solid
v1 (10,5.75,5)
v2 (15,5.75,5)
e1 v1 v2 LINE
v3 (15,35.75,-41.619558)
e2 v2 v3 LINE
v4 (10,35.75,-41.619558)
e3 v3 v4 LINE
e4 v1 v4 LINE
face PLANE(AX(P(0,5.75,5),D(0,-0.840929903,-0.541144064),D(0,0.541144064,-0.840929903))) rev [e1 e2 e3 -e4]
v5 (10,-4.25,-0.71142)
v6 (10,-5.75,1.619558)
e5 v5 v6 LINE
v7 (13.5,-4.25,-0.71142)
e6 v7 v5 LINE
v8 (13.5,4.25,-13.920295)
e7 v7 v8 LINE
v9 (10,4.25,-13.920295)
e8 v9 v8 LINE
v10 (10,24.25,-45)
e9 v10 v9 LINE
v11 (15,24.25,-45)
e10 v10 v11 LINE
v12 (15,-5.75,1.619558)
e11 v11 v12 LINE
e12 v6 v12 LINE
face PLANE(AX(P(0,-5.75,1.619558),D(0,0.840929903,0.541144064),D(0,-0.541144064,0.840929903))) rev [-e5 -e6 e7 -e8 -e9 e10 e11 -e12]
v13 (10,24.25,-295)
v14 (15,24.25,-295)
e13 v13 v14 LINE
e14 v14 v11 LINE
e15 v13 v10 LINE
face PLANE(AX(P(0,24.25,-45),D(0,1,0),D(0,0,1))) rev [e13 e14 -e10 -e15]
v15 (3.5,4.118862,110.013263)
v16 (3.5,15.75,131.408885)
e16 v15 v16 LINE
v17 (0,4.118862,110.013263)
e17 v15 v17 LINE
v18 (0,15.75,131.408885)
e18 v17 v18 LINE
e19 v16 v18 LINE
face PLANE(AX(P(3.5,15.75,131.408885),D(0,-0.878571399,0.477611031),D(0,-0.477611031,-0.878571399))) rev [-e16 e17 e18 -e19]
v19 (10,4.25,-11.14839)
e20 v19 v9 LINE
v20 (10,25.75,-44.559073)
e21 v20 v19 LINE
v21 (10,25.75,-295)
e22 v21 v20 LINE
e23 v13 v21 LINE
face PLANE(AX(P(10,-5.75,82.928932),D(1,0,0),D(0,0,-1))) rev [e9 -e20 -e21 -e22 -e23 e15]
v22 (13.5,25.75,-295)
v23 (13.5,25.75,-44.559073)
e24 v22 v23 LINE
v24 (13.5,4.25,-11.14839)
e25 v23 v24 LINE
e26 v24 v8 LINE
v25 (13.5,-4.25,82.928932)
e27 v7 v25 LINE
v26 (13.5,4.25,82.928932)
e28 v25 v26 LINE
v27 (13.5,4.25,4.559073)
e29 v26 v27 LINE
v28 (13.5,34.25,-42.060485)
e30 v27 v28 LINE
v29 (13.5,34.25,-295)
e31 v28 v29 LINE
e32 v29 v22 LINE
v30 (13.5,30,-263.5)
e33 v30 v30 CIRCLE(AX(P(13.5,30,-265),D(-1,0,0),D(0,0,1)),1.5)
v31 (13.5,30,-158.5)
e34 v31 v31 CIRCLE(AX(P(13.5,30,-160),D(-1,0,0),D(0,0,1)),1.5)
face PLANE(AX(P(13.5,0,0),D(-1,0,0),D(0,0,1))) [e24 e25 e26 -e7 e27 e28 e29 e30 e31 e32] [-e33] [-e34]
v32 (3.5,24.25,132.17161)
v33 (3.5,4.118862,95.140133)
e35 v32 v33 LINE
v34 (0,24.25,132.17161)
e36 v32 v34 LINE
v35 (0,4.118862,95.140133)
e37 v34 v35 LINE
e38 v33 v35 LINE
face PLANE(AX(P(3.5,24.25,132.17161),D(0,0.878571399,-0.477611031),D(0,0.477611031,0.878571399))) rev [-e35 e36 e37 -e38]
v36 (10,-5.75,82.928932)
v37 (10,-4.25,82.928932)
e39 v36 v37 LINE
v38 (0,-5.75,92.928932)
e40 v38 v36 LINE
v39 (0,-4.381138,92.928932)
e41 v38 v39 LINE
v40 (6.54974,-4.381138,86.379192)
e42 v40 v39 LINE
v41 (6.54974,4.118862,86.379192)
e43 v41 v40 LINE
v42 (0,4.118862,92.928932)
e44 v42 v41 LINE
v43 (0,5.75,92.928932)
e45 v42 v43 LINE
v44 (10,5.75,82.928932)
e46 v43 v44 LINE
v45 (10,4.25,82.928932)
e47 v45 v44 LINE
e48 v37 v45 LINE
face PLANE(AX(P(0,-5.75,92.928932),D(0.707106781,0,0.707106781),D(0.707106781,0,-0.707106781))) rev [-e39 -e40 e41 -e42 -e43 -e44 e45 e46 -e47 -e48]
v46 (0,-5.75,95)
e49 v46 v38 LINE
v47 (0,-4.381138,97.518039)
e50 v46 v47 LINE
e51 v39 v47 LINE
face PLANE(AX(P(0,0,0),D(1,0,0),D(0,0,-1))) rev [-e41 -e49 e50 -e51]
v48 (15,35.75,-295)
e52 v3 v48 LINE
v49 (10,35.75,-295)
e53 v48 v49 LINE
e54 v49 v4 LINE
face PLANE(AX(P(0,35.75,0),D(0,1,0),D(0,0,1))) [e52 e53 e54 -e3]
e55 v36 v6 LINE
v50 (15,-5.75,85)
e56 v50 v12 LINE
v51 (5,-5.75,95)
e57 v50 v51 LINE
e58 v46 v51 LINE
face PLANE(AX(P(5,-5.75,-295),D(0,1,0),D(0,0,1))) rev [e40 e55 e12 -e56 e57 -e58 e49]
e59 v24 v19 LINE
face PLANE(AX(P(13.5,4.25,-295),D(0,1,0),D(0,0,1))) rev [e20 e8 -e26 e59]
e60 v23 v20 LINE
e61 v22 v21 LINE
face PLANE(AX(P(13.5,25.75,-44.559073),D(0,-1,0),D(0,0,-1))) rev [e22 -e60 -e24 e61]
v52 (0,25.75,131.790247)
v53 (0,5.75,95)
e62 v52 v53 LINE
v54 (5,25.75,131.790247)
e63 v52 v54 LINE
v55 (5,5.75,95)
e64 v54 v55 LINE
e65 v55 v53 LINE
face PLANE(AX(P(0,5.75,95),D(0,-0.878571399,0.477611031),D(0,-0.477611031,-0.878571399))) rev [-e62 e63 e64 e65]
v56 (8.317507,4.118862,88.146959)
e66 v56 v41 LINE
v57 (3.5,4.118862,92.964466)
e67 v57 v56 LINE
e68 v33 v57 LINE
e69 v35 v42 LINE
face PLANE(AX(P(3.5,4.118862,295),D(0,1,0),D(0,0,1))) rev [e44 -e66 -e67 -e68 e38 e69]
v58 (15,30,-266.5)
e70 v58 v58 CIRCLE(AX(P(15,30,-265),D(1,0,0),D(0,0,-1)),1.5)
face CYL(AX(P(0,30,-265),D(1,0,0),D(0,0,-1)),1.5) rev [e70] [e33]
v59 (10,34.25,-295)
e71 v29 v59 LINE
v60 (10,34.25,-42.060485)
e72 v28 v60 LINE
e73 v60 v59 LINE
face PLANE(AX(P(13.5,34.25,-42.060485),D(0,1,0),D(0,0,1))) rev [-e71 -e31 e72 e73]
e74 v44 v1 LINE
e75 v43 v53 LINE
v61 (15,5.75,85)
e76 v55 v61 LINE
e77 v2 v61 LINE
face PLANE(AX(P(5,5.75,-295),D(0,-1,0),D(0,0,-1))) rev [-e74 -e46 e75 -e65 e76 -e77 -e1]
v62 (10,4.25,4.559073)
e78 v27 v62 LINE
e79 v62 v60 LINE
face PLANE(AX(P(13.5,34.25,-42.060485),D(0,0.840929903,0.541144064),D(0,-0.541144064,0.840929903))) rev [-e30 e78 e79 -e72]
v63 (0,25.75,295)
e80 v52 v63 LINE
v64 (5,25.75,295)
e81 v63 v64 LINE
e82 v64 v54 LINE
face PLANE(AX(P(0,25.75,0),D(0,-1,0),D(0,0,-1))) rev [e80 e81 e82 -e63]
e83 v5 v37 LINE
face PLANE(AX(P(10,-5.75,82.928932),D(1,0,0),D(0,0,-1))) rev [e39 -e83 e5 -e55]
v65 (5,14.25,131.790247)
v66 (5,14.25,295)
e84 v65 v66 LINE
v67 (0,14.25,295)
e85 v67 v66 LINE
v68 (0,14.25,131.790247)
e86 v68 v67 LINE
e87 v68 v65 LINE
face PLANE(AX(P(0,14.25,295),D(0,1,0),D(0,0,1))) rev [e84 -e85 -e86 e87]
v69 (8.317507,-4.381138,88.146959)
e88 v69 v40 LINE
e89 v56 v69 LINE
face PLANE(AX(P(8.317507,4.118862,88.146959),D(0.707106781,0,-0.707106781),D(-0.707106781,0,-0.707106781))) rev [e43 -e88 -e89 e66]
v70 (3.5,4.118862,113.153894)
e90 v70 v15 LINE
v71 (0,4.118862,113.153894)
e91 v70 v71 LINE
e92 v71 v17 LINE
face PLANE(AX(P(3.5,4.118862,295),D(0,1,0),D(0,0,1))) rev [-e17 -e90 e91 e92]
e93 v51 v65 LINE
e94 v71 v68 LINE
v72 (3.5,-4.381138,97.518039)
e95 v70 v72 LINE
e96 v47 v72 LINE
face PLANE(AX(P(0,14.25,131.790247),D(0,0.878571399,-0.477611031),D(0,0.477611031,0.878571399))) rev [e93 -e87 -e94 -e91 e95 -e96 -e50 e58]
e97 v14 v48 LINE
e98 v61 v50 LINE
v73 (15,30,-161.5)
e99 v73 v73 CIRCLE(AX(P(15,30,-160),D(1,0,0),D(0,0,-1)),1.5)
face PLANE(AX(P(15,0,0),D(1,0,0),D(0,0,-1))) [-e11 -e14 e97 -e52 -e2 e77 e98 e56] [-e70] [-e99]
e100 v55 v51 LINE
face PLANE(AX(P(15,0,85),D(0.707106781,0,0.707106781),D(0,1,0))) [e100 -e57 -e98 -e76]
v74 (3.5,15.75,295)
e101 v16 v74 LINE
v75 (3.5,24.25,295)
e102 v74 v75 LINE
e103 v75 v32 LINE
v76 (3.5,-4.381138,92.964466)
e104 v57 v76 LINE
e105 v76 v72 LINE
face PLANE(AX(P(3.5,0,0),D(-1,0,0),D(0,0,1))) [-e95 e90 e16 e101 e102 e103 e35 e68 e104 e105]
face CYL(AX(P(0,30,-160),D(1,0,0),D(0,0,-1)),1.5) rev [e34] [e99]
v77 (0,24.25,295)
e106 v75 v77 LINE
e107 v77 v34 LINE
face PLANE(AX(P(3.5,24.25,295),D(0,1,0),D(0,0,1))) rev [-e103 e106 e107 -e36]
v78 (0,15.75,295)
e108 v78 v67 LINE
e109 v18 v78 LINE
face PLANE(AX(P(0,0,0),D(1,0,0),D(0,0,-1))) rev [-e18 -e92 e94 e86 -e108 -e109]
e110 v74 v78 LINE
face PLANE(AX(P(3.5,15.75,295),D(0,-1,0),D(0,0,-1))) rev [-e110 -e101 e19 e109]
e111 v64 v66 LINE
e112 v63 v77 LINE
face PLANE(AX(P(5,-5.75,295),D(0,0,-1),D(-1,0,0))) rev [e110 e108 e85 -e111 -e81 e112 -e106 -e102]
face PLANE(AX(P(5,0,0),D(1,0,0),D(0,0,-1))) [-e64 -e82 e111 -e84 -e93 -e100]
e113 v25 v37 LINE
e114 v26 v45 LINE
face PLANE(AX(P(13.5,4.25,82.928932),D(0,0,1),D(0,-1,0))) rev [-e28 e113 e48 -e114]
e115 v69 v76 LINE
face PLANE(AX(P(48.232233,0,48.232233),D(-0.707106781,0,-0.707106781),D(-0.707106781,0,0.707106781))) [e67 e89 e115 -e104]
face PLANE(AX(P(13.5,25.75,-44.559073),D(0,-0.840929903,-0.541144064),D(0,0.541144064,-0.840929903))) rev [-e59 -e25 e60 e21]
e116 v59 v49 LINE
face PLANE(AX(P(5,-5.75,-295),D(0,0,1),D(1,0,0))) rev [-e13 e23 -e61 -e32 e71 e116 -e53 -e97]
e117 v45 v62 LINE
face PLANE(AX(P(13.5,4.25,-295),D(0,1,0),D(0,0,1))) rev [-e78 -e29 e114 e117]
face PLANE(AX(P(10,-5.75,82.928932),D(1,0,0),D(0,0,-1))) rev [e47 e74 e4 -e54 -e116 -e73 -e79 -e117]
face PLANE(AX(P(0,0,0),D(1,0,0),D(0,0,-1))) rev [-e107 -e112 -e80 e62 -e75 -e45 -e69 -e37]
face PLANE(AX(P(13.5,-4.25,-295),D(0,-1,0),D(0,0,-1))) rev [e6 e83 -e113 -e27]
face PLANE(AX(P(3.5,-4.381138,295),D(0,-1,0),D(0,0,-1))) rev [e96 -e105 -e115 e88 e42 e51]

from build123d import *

# Parameters (mm, degrees)
SKETCH_1_W           = 590
SKETCH_1_H           = 11.5
EXTRUDE_1_DEPTH      = 5
SKETCH_2_W           = 590
SKETCH_2_H           = 8.5
CUT_EXTRUDE_1_DEPTH  = 3.5
SKETCH_3_W           = 390
SKETCH_3_H           = 11.5
EXTRUDE_2_DEPTH      = 10
CHAMFER_1_SIZE       = 10
CUT_EXTRUDE_2_DEPTH  = 296.604888322
SKETCH_5_W           = 377.928932188
SKETCH_5_H           = 8.5
CUT_EXTRUDE_3_DEPTH  = 3.5
SKETCH_7_W           = 9.262731361
SKETCH_7_H           = 8.5
CUT_EXTRUDE_5_DEPTH  = 2.5
SKETCH_8_W           = 5
SKETCH_8_H           = 200
EXTRUDE_3_DEPTH      = 20
CUT_EXTRUDE_6_DEPTH  = 297.29050356
CUT_EXTRUDE_7_DEPTH  = 297.29050356
CUT_EXTRUDE_8_DEPTH  = 3.5
SKETCH_12_W          = 5
SKETCH_12_H          = 300
EXTRUDE_4_DEPTH      = 30
CUT_EXTRUDE_9_DEPTH  = 298.536657405
CUT_EXTRUDE_10_DEPTH = 3.5
SKETCH_16_R          = 1.5
CUT_EXTRUDE_11_DEPTH = 298.536657405


with BuildPart() as part:
    # 草图1 → 凸台-拉伸1 (new body)
    with BuildSketch(Plane(origin=(0, 0, 0), x_dir=(0, 0, -1), z_dir=(1, 0, 0))):
        Rectangle(SKETCH_1_W, SKETCH_1_H)
    extrude(amount=EXTRUDE_1_DEPTH)

    # 草图2 → 切除-拉伸1 (cut)
    with BuildSketch(Plane.ZY):
        with Locations((0, -0.131137871)):
            Rectangle(SKETCH_2_W, SKETCH_2_H)
    extrude(amount=-CUT_EXTRUDE_1_DEPTH, mode=Mode.SUBTRACT)

    # 草图3 → 凸台-拉伸2 (add)
    with BuildSketch(Plane(origin=(5, 0, 0), x_dir=(0, 0, -1), z_dir=(1, 0, 0))):
        with Locations((100, 0)):
            Rectangle(SKETCH_3_W, SKETCH_3_H)
    extrude(amount=EXTRUDE_2_DEPTH)

    # 倒角1
    chamfer_1_edges = [part.edges().sort_by_distance(p)[0] for p in [
        (15, 0, 95),
    ]]
    chamfer(chamfer_1_edges, length=CHAMFER_1_SIZE - 0.0001)  # a hair under: the kernel refuses the full size

    # 草图4 → 切除-拉伸2 (cut, through all)
    with BuildSketch(Plane(origin=(0, 5.75, 0), x_dir=(1, 0, 0), z_dir=(0, 1, 0))):
        Polygon((0, -92.928932188), (0, 295), (10, 295), (10, -82.928932188), align=None)
    extrude(amount=-CUT_EXTRUDE_2_DEPTH, mode=Mode.SUBTRACT)

    # 草图5 → 切除-拉伸3 (cut)
    with BuildSketch(Plane.ZY.offset(-10)):
        with Locations((-106.035533906, 0)):
            Rectangle(SKETCH_5_W, SKETCH_5_H)
    extrude(amount=-CUT_EXTRUDE_3_DEPTH, mode=Mode.SUBTRACT)

    # 草图7 → 切除-拉伸5 (cut)
    with BuildSketch(Plane(origin=(46.464466094, 0, 46.464466094), x_dir=(-0.7071067811865471, 0, 0.7071067811865479), z_dir=(-0.7071067811865479, 0, -0.7071067811865471))):
        with Locations((61.079312439, -0.131137871)):
            Rectangle(SKETCH_7_W, SKETCH_7_H)
    extrude(amount=-CUT_EXTRUDE_5_DEPTH, mode=Mode.SUBTRACT)

    # 草图8 → 凸台-拉伸3 (add)
    with BuildSketch(Plane(origin=(0, 5.75, 0), x_dir=(1, 0, 0), z_dir=(0, 1, 0))):
        with Locations((2.5, -195)):
            Rectangle(SKETCH_8_W, SKETCH_8_H)
    extrude(amount=EXTRUDE_3_DEPTH)

    # 草图9 → 切除-拉伸6 (cut, through all)
    with BuildSketch(Plane(origin=(5, 0, 0), x_dir=(0, 0, -1), z_dir=(1, 0, 0))):
        Polygon((-295, 14.25), (-131.790247395, 14.25), (-95, -5.75), (-295, -5.75), align=None)
    extrude(amount=-CUT_EXTRUDE_6_DEPTH, mode=Mode.SUBTRACT)

    # 草图10 → 切除-拉伸7 (cut, through all)
    with BuildSketch(Plane(origin=(5, 0, 0), x_dir=(0, 0, -1), z_dir=(1, 0, 0))):
        Polygon((-95, 5.75), (-131.790247395, 25.75), (-95, 25.75), align=None)
    extrude(amount=-CUT_EXTRUDE_7_DEPTH, mode=Mode.SUBTRACT)

    # 草图11 → 切除-拉伸8 (cut)
    with BuildSketch(Plane.ZY):
        Polygon((132.171609821, 24.25), (95.140132691, 4.118862129), (110.013262981, 4.118862129), (131.408884969, 15.75), (295, 15.75), (295, 24.25), align=None)
    extrude(amount=-CUT_EXTRUDE_8_DEPTH, mode=Mode.SUBTRACT)

    # 草图12 → 凸台-拉伸4 (add)
    with BuildSketch(Plane(origin=(0, 5.75, 0), x_dir=(1, 0, 0), z_dir=(0, 1, 0))):
        with Locations((12.5, 145)):
            Rectangle(SKETCH_12_W, SKETCH_12_H)
    extrude(amount=EXTRUDE_4_DEPTH)

    # 草图13 → 切除-拉伸9 (cut, through all)
    with BuildSketch(Plane(origin=(15, 0, 0), x_dir=(0, 0, -1), z_dir=(1, 0, 0))):
        Polygon((-1.619558014, -5.75), (45, 24.25), (295, 24.25), (295, -5.75), align=None)
        Polygon((-5, 5.75), (41.619558014, 35.75), (-5, 35.75), align=None)
    extrude(amount=-CUT_EXTRUDE_9_DEPTH, mode=Mode.SUBTRACT)

    # 草图15 → 切除-拉伸10 (cut)
    with BuildSketch(Plane.ZY.offset(-10)):
        Polygon((-44.559072784, 25.75), (-295, 25.75), (-295, 34.25), (-42.06048523, 34.25), (4.559072784, 4.25), (-11.148389541, 4.25), align=None)
    extrude(amount=-CUT_EXTRUDE_10_DEPTH, mode=Mode.SUBTRACT)

    # 草图16 → 切除-拉伸11 (cut, through all)
    with BuildSketch(Plane(origin=(15, 0, 0), x_dir=(0, 0, -1), z_dir=(1, 0, 0))):
        with Locations((160, 30)):
            Circle(SKETCH_16_R)
        with Locations((265, 30)):
            Circle(SKETCH_16_R)
    extrude(amount=-CUT_EXTRUDE_11_DEPTH, mode=Mode.SUBTRACT)


solid = part.part
